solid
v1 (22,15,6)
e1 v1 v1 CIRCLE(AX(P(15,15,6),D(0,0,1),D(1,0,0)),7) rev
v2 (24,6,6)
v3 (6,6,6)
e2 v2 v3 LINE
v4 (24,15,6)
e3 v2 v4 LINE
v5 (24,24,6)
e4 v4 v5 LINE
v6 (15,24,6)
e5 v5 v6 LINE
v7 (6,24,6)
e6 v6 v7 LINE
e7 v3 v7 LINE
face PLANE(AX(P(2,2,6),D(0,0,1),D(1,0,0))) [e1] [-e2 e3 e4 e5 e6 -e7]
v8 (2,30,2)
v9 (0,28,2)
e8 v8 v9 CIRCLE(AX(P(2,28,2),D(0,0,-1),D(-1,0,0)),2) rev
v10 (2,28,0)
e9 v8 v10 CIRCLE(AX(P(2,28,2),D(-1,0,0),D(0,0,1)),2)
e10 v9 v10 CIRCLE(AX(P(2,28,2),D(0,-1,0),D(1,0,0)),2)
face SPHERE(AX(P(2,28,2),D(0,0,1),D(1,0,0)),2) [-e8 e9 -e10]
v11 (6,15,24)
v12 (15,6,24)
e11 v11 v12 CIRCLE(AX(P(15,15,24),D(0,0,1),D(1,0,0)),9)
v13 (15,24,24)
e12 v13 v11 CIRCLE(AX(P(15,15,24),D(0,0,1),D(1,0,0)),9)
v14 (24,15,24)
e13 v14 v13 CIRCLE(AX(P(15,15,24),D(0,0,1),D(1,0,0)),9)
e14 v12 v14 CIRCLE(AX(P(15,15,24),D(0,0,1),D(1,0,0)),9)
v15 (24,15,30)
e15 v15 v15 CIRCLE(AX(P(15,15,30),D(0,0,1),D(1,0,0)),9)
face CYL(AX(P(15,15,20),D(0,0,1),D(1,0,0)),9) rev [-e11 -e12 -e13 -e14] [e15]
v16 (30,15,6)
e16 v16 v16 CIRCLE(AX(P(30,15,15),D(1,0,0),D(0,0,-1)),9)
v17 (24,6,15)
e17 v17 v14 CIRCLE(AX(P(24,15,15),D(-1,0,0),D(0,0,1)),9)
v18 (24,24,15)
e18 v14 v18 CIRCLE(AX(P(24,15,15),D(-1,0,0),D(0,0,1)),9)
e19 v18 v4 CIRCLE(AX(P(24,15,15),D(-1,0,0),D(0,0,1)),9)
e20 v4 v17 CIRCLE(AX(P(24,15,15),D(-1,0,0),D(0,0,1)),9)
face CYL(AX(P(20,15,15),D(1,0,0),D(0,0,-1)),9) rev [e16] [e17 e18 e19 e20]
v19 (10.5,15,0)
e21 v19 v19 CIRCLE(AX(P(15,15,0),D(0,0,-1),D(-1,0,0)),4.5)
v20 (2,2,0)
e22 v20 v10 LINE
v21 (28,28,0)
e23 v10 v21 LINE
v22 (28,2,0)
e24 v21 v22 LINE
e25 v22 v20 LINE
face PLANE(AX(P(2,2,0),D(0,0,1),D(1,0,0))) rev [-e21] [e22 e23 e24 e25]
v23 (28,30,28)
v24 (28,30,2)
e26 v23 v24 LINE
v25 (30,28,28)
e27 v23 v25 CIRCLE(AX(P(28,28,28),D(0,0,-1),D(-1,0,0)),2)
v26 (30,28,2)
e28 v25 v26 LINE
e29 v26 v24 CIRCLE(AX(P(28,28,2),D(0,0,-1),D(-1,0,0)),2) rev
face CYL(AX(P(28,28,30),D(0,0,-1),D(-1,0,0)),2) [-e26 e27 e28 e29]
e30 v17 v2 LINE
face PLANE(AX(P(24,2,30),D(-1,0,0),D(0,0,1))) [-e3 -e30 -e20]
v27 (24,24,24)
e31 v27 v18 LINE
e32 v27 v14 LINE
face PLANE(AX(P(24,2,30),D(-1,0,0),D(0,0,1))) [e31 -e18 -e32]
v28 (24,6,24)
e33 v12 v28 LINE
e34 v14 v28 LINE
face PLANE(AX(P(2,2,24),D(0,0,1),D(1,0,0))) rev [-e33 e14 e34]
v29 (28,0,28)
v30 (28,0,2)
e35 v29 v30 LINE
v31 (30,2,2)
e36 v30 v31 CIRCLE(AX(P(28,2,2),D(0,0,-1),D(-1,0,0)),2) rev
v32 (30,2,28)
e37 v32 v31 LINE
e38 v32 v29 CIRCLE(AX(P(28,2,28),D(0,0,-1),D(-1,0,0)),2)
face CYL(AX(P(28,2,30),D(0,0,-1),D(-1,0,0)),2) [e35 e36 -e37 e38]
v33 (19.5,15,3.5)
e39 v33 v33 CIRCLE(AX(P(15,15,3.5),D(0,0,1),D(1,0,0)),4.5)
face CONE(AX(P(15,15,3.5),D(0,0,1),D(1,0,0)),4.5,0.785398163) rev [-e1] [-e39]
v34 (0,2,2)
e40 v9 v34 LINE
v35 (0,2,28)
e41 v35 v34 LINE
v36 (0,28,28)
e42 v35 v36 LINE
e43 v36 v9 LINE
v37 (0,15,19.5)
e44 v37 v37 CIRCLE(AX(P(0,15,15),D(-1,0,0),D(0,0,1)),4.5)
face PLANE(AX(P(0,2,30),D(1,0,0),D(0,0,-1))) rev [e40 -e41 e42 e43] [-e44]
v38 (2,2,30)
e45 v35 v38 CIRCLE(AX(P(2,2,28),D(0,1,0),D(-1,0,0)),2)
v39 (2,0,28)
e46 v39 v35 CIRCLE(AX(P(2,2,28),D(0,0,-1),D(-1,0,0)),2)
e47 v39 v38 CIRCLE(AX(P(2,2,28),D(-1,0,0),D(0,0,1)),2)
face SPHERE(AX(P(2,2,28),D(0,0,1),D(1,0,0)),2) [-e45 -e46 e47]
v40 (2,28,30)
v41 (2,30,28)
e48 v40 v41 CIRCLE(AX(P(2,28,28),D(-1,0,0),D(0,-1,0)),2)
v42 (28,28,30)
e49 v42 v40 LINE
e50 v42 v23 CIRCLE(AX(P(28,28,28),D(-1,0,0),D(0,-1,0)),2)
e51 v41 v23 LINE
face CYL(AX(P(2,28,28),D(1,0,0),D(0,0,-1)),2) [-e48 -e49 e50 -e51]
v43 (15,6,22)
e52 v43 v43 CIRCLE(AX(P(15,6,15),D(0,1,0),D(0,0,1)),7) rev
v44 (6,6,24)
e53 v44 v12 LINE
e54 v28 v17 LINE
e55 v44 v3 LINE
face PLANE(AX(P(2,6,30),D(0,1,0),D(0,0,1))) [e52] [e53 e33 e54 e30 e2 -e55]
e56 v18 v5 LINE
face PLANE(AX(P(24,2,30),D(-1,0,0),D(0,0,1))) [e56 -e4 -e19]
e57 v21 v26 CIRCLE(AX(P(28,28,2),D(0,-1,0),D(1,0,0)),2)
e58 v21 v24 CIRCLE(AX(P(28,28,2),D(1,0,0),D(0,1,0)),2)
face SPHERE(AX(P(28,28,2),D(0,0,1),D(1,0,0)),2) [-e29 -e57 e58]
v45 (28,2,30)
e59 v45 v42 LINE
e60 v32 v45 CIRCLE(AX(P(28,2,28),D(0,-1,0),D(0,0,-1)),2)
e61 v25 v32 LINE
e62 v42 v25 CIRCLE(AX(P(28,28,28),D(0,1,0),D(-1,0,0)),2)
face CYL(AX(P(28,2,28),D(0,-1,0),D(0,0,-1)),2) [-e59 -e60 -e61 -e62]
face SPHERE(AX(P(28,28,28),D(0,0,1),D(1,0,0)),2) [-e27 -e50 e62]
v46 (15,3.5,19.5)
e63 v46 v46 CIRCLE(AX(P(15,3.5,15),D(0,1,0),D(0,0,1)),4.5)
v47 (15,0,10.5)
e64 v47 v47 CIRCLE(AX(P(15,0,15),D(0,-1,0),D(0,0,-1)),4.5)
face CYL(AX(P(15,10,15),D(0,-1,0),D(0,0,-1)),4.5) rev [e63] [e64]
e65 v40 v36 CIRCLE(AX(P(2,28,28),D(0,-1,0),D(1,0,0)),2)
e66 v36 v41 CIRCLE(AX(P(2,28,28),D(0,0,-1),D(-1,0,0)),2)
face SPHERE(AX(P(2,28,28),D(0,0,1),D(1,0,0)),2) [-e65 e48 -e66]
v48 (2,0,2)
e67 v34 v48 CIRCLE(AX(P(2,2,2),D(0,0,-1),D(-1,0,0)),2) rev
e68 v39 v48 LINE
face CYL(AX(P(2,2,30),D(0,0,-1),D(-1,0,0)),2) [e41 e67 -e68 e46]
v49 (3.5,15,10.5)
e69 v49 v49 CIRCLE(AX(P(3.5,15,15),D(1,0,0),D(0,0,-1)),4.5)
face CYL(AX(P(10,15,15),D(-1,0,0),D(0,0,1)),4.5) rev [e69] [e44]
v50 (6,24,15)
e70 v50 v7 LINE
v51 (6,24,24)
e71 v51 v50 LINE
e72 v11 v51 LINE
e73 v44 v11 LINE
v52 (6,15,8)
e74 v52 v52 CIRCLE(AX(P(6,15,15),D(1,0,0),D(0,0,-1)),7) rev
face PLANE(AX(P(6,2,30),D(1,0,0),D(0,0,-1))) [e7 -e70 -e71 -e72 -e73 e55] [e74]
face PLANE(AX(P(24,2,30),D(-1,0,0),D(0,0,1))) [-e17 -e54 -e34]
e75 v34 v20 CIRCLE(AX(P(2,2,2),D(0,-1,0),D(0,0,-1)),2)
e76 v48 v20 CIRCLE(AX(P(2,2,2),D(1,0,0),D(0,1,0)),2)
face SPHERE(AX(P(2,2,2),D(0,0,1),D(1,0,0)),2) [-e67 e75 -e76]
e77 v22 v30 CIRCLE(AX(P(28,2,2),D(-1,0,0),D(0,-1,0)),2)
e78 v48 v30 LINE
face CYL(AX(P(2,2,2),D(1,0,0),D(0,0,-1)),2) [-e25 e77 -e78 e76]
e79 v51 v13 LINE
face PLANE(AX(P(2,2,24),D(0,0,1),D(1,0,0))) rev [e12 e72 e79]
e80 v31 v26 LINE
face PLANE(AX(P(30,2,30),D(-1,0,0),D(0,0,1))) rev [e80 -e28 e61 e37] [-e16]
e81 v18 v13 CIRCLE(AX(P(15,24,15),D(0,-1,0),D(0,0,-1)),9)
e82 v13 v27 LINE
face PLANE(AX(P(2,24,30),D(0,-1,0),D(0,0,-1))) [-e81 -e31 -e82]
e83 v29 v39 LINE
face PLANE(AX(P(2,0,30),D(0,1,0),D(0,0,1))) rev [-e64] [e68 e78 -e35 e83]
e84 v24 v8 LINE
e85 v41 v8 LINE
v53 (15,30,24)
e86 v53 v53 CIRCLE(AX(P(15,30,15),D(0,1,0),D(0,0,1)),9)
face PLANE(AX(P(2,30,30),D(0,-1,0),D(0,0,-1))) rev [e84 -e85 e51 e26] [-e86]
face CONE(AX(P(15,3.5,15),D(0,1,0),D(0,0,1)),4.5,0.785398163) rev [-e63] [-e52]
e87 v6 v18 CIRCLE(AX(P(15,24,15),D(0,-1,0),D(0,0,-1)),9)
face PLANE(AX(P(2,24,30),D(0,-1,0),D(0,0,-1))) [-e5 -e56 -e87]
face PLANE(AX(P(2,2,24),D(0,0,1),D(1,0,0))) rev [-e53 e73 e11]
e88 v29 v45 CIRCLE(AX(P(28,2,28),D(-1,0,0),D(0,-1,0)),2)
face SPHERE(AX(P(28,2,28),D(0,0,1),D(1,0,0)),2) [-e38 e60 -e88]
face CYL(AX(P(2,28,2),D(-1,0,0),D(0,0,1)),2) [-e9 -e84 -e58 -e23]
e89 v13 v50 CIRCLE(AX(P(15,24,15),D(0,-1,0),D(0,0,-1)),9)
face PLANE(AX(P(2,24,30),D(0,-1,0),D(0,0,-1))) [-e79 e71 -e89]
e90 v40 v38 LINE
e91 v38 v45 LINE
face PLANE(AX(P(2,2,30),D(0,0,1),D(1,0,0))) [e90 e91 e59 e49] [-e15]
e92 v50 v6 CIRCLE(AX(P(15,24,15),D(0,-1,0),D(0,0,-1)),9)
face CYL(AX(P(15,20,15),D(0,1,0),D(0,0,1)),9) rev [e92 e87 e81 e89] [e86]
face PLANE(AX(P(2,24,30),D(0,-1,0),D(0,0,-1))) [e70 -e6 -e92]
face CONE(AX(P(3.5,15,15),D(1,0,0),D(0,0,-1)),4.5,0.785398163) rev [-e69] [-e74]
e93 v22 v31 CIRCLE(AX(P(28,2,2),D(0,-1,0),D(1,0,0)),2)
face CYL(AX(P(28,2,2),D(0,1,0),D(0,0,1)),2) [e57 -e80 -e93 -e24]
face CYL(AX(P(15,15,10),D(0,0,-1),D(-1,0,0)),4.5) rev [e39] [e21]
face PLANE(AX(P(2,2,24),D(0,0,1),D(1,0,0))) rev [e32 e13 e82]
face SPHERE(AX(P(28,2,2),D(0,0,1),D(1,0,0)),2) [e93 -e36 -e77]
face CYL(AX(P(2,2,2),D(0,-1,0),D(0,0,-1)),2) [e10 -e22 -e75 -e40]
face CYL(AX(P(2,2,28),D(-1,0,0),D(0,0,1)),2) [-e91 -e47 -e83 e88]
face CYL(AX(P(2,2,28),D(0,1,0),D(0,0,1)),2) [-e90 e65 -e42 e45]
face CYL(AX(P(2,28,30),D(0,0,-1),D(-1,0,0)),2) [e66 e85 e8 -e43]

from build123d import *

# Parameters (mm, degrees)
BOSS_EXTRUDE1_DEPTH = 30
FILLET1_R           = 2
SHELL2_T            = 6
SKETCH3_R           = 9
CUT_EXTRUDE1_DEPTH  = 10
SKETCH4_R           = 9
CUT_EXTRUDE2_DEPTH  = 10
SKETCH5_R           = 9
CUT_EXTRUDE3_DEPTH  = 10
SKETCH7_R           = 4.5
CUT_EXTRUDE4_DEPTH  = 10
SKETCH8_R           = 4.5
CUT_EXTRUDE5_DEPTH  = 10
SKETCH9_R           = 4.5
CUT_EXTRUDE6_DEPTH  = 10
CHAMFER2_SIZE       = 2.5


with BuildPart() as part:
    # Sketch1 → Boss-Extrude1 (new body)
    with BuildSketch(Plane.XY):
        with BuildLine():
            Line((2, 0), (28, 0))
            ThreePointArc((28, 0), (29.414213562, 0.585786438), (30, 2))
            Line((30, 2), (30, 28))
            ThreePointArc((30, 28), (29.414213562, 29.414213562), (28, 30))
            Line((28, 30), (2, 30))
            ThreePointArc((2, 30), (0.585786438, 29.414213562), (0, 28))
            Line((0, 28), (0, 2))
            ThreePointArc((0, 2), (0.585786438, 0.585786438), (2, 0))
        make_face()
    extrude(amount=BOSS_EXTRUDE1_DEPTH)

    # Fillet1
    fillet1_edges = [part.edges().sort_by_distance(p)[0] for p in [
        (29.414213562, 0.585786438, 30),
        (15, 0, 0),
        (0.585786438, 0.585786438, 0),
        (30, 15, 30),
        (29.414213562, 29.414213562, 30),
        (15, 30, 30),
        (0.585786438, 29.414213562, 30),
        (0, 15, 30),
        (0.585786438, 0.585786438, 30),
        (15, 0, 30),
        (0, 15, 0),
        (0.585786438, 29.414213562, 0),
        (15, 30, 0),
        (29.414213562, 29.414213562, 0),
        (30, 15, 0),
        (29.414213562, 0.585786438, 0),
    ]]
    fillet(fillet1_edges, radius=FILLET1_R)

    # Shell2 (no face opened: a closed hollow body)
    add(offset(amount=-SHELL2_T, mode=Mode.PRIVATE), mode=Mode.SUBTRACT)

    # Sketch3 → Cut-Extrude1 (cut)
    with BuildSketch(Plane.XY.offset(30)):
        with Locations((15, 15)):
            Circle(SKETCH3_R)
    extrude(amount=-CUT_EXTRUDE1_DEPTH, mode=Mode.SUBTRACT)

    # Sketch4 → Cut-Extrude2 (cut)
    with BuildSketch(Plane(origin=(30, 0, 0), x_dir=(0, 0, -1), z_dir=(1, 0, 0))):
        with Locations((-15, 15)):
            Circle(SKETCH4_R)
    extrude(amount=-CUT_EXTRUDE2_DEPTH, mode=Mode.SUBTRACT)

    # Sketch5 → Cut-Extrude3 (cut)
    with BuildSketch(Plane(origin=(0, 30, 0), x_dir=(1, 0, 0), z_dir=(0, 1, 0))):
        with Locations(Location((15, -15, 0), (0, 0, 270))):
            Circle(SKETCH5_R)
    extrude(amount=-CUT_EXTRUDE3_DEPTH, mode=Mode.SUBTRACT)

    # Sketch7 → Cut-Extrude4 (cut)
    with BuildSketch(Plane.ZY):
        with Locations((15, 15)):
            Circle(SKETCH7_R)
    extrude(amount=-CUT_EXTRUDE4_DEPTH, mode=Mode.SUBTRACT)

    # Sketch8 → Cut-Extrude5 (cut)
    with BuildSketch(Plane(origin=(0, 0, 0), x_dir=(-1, 0, 0), z_dir=(0, 0, -1))):
        with Locations((-15, 15)):
            Circle(SKETCH8_R)
    extrude(amount=-CUT_EXTRUDE5_DEPTH, mode=Mode.SUBTRACT)

    # Sketch9 → Cut-Extrude6 (cut)
    with BuildSketch(Plane.XZ):
        with Locations(Location((15, 15, 0), (0, 0, 270))):
            Circle(SKETCH9_R)
    extrude(amount=-CUT_EXTRUDE6_DEPTH, mode=Mode.SUBTRACT)

    # Chamfer2
    # the kernel refuses this chamfer: 2.5 mm, written as the material it takes off along each edge
    with BuildSketch(Plane(origin=(6, 15, 15), x_dir=(0, 0, 1), z_dir=(0, -1, 0))) as chamfer2_piece_1:
        Polygon((4.5, CHAMFER2_SIZE), (4.5 + CHAMFER2_SIZE, 0), (4.5, 0), align=None)
    revolve(axis=Axis((6, 15, 15), (-1, 0, 0)), mode=Mode.SUBTRACT)
    with BuildSketch(Plane(origin=(15, 15, 6), x_dir=(-1, 0, 0), z_dir=(0, -1, 0))) as chamfer2_piece_2:
        Polygon((4.5, CHAMFER2_SIZE), (4.5 + CHAMFER2_SIZE, 0), (4.5, 0), align=None)
    revolve(axis=Axis((15, 15, 6), (0, 0, -1)), mode=Mode.SUBTRACT)
    with BuildSketch(Plane(origin=(15, 6, 15), x_dir=(0, 0, -1), z_dir=(-1, 0, 0))) as chamfer2_piece_3:
        Polygon((4.5, CHAMFER2_SIZE), (4.5 + CHAMFER2_SIZE, 0), (4.5, 0), align=None)
    revolve(axis=Axis((15, 6, 15), (0, -1, 0)), mode=Mode.SUBTRACT)


solid = part.part
